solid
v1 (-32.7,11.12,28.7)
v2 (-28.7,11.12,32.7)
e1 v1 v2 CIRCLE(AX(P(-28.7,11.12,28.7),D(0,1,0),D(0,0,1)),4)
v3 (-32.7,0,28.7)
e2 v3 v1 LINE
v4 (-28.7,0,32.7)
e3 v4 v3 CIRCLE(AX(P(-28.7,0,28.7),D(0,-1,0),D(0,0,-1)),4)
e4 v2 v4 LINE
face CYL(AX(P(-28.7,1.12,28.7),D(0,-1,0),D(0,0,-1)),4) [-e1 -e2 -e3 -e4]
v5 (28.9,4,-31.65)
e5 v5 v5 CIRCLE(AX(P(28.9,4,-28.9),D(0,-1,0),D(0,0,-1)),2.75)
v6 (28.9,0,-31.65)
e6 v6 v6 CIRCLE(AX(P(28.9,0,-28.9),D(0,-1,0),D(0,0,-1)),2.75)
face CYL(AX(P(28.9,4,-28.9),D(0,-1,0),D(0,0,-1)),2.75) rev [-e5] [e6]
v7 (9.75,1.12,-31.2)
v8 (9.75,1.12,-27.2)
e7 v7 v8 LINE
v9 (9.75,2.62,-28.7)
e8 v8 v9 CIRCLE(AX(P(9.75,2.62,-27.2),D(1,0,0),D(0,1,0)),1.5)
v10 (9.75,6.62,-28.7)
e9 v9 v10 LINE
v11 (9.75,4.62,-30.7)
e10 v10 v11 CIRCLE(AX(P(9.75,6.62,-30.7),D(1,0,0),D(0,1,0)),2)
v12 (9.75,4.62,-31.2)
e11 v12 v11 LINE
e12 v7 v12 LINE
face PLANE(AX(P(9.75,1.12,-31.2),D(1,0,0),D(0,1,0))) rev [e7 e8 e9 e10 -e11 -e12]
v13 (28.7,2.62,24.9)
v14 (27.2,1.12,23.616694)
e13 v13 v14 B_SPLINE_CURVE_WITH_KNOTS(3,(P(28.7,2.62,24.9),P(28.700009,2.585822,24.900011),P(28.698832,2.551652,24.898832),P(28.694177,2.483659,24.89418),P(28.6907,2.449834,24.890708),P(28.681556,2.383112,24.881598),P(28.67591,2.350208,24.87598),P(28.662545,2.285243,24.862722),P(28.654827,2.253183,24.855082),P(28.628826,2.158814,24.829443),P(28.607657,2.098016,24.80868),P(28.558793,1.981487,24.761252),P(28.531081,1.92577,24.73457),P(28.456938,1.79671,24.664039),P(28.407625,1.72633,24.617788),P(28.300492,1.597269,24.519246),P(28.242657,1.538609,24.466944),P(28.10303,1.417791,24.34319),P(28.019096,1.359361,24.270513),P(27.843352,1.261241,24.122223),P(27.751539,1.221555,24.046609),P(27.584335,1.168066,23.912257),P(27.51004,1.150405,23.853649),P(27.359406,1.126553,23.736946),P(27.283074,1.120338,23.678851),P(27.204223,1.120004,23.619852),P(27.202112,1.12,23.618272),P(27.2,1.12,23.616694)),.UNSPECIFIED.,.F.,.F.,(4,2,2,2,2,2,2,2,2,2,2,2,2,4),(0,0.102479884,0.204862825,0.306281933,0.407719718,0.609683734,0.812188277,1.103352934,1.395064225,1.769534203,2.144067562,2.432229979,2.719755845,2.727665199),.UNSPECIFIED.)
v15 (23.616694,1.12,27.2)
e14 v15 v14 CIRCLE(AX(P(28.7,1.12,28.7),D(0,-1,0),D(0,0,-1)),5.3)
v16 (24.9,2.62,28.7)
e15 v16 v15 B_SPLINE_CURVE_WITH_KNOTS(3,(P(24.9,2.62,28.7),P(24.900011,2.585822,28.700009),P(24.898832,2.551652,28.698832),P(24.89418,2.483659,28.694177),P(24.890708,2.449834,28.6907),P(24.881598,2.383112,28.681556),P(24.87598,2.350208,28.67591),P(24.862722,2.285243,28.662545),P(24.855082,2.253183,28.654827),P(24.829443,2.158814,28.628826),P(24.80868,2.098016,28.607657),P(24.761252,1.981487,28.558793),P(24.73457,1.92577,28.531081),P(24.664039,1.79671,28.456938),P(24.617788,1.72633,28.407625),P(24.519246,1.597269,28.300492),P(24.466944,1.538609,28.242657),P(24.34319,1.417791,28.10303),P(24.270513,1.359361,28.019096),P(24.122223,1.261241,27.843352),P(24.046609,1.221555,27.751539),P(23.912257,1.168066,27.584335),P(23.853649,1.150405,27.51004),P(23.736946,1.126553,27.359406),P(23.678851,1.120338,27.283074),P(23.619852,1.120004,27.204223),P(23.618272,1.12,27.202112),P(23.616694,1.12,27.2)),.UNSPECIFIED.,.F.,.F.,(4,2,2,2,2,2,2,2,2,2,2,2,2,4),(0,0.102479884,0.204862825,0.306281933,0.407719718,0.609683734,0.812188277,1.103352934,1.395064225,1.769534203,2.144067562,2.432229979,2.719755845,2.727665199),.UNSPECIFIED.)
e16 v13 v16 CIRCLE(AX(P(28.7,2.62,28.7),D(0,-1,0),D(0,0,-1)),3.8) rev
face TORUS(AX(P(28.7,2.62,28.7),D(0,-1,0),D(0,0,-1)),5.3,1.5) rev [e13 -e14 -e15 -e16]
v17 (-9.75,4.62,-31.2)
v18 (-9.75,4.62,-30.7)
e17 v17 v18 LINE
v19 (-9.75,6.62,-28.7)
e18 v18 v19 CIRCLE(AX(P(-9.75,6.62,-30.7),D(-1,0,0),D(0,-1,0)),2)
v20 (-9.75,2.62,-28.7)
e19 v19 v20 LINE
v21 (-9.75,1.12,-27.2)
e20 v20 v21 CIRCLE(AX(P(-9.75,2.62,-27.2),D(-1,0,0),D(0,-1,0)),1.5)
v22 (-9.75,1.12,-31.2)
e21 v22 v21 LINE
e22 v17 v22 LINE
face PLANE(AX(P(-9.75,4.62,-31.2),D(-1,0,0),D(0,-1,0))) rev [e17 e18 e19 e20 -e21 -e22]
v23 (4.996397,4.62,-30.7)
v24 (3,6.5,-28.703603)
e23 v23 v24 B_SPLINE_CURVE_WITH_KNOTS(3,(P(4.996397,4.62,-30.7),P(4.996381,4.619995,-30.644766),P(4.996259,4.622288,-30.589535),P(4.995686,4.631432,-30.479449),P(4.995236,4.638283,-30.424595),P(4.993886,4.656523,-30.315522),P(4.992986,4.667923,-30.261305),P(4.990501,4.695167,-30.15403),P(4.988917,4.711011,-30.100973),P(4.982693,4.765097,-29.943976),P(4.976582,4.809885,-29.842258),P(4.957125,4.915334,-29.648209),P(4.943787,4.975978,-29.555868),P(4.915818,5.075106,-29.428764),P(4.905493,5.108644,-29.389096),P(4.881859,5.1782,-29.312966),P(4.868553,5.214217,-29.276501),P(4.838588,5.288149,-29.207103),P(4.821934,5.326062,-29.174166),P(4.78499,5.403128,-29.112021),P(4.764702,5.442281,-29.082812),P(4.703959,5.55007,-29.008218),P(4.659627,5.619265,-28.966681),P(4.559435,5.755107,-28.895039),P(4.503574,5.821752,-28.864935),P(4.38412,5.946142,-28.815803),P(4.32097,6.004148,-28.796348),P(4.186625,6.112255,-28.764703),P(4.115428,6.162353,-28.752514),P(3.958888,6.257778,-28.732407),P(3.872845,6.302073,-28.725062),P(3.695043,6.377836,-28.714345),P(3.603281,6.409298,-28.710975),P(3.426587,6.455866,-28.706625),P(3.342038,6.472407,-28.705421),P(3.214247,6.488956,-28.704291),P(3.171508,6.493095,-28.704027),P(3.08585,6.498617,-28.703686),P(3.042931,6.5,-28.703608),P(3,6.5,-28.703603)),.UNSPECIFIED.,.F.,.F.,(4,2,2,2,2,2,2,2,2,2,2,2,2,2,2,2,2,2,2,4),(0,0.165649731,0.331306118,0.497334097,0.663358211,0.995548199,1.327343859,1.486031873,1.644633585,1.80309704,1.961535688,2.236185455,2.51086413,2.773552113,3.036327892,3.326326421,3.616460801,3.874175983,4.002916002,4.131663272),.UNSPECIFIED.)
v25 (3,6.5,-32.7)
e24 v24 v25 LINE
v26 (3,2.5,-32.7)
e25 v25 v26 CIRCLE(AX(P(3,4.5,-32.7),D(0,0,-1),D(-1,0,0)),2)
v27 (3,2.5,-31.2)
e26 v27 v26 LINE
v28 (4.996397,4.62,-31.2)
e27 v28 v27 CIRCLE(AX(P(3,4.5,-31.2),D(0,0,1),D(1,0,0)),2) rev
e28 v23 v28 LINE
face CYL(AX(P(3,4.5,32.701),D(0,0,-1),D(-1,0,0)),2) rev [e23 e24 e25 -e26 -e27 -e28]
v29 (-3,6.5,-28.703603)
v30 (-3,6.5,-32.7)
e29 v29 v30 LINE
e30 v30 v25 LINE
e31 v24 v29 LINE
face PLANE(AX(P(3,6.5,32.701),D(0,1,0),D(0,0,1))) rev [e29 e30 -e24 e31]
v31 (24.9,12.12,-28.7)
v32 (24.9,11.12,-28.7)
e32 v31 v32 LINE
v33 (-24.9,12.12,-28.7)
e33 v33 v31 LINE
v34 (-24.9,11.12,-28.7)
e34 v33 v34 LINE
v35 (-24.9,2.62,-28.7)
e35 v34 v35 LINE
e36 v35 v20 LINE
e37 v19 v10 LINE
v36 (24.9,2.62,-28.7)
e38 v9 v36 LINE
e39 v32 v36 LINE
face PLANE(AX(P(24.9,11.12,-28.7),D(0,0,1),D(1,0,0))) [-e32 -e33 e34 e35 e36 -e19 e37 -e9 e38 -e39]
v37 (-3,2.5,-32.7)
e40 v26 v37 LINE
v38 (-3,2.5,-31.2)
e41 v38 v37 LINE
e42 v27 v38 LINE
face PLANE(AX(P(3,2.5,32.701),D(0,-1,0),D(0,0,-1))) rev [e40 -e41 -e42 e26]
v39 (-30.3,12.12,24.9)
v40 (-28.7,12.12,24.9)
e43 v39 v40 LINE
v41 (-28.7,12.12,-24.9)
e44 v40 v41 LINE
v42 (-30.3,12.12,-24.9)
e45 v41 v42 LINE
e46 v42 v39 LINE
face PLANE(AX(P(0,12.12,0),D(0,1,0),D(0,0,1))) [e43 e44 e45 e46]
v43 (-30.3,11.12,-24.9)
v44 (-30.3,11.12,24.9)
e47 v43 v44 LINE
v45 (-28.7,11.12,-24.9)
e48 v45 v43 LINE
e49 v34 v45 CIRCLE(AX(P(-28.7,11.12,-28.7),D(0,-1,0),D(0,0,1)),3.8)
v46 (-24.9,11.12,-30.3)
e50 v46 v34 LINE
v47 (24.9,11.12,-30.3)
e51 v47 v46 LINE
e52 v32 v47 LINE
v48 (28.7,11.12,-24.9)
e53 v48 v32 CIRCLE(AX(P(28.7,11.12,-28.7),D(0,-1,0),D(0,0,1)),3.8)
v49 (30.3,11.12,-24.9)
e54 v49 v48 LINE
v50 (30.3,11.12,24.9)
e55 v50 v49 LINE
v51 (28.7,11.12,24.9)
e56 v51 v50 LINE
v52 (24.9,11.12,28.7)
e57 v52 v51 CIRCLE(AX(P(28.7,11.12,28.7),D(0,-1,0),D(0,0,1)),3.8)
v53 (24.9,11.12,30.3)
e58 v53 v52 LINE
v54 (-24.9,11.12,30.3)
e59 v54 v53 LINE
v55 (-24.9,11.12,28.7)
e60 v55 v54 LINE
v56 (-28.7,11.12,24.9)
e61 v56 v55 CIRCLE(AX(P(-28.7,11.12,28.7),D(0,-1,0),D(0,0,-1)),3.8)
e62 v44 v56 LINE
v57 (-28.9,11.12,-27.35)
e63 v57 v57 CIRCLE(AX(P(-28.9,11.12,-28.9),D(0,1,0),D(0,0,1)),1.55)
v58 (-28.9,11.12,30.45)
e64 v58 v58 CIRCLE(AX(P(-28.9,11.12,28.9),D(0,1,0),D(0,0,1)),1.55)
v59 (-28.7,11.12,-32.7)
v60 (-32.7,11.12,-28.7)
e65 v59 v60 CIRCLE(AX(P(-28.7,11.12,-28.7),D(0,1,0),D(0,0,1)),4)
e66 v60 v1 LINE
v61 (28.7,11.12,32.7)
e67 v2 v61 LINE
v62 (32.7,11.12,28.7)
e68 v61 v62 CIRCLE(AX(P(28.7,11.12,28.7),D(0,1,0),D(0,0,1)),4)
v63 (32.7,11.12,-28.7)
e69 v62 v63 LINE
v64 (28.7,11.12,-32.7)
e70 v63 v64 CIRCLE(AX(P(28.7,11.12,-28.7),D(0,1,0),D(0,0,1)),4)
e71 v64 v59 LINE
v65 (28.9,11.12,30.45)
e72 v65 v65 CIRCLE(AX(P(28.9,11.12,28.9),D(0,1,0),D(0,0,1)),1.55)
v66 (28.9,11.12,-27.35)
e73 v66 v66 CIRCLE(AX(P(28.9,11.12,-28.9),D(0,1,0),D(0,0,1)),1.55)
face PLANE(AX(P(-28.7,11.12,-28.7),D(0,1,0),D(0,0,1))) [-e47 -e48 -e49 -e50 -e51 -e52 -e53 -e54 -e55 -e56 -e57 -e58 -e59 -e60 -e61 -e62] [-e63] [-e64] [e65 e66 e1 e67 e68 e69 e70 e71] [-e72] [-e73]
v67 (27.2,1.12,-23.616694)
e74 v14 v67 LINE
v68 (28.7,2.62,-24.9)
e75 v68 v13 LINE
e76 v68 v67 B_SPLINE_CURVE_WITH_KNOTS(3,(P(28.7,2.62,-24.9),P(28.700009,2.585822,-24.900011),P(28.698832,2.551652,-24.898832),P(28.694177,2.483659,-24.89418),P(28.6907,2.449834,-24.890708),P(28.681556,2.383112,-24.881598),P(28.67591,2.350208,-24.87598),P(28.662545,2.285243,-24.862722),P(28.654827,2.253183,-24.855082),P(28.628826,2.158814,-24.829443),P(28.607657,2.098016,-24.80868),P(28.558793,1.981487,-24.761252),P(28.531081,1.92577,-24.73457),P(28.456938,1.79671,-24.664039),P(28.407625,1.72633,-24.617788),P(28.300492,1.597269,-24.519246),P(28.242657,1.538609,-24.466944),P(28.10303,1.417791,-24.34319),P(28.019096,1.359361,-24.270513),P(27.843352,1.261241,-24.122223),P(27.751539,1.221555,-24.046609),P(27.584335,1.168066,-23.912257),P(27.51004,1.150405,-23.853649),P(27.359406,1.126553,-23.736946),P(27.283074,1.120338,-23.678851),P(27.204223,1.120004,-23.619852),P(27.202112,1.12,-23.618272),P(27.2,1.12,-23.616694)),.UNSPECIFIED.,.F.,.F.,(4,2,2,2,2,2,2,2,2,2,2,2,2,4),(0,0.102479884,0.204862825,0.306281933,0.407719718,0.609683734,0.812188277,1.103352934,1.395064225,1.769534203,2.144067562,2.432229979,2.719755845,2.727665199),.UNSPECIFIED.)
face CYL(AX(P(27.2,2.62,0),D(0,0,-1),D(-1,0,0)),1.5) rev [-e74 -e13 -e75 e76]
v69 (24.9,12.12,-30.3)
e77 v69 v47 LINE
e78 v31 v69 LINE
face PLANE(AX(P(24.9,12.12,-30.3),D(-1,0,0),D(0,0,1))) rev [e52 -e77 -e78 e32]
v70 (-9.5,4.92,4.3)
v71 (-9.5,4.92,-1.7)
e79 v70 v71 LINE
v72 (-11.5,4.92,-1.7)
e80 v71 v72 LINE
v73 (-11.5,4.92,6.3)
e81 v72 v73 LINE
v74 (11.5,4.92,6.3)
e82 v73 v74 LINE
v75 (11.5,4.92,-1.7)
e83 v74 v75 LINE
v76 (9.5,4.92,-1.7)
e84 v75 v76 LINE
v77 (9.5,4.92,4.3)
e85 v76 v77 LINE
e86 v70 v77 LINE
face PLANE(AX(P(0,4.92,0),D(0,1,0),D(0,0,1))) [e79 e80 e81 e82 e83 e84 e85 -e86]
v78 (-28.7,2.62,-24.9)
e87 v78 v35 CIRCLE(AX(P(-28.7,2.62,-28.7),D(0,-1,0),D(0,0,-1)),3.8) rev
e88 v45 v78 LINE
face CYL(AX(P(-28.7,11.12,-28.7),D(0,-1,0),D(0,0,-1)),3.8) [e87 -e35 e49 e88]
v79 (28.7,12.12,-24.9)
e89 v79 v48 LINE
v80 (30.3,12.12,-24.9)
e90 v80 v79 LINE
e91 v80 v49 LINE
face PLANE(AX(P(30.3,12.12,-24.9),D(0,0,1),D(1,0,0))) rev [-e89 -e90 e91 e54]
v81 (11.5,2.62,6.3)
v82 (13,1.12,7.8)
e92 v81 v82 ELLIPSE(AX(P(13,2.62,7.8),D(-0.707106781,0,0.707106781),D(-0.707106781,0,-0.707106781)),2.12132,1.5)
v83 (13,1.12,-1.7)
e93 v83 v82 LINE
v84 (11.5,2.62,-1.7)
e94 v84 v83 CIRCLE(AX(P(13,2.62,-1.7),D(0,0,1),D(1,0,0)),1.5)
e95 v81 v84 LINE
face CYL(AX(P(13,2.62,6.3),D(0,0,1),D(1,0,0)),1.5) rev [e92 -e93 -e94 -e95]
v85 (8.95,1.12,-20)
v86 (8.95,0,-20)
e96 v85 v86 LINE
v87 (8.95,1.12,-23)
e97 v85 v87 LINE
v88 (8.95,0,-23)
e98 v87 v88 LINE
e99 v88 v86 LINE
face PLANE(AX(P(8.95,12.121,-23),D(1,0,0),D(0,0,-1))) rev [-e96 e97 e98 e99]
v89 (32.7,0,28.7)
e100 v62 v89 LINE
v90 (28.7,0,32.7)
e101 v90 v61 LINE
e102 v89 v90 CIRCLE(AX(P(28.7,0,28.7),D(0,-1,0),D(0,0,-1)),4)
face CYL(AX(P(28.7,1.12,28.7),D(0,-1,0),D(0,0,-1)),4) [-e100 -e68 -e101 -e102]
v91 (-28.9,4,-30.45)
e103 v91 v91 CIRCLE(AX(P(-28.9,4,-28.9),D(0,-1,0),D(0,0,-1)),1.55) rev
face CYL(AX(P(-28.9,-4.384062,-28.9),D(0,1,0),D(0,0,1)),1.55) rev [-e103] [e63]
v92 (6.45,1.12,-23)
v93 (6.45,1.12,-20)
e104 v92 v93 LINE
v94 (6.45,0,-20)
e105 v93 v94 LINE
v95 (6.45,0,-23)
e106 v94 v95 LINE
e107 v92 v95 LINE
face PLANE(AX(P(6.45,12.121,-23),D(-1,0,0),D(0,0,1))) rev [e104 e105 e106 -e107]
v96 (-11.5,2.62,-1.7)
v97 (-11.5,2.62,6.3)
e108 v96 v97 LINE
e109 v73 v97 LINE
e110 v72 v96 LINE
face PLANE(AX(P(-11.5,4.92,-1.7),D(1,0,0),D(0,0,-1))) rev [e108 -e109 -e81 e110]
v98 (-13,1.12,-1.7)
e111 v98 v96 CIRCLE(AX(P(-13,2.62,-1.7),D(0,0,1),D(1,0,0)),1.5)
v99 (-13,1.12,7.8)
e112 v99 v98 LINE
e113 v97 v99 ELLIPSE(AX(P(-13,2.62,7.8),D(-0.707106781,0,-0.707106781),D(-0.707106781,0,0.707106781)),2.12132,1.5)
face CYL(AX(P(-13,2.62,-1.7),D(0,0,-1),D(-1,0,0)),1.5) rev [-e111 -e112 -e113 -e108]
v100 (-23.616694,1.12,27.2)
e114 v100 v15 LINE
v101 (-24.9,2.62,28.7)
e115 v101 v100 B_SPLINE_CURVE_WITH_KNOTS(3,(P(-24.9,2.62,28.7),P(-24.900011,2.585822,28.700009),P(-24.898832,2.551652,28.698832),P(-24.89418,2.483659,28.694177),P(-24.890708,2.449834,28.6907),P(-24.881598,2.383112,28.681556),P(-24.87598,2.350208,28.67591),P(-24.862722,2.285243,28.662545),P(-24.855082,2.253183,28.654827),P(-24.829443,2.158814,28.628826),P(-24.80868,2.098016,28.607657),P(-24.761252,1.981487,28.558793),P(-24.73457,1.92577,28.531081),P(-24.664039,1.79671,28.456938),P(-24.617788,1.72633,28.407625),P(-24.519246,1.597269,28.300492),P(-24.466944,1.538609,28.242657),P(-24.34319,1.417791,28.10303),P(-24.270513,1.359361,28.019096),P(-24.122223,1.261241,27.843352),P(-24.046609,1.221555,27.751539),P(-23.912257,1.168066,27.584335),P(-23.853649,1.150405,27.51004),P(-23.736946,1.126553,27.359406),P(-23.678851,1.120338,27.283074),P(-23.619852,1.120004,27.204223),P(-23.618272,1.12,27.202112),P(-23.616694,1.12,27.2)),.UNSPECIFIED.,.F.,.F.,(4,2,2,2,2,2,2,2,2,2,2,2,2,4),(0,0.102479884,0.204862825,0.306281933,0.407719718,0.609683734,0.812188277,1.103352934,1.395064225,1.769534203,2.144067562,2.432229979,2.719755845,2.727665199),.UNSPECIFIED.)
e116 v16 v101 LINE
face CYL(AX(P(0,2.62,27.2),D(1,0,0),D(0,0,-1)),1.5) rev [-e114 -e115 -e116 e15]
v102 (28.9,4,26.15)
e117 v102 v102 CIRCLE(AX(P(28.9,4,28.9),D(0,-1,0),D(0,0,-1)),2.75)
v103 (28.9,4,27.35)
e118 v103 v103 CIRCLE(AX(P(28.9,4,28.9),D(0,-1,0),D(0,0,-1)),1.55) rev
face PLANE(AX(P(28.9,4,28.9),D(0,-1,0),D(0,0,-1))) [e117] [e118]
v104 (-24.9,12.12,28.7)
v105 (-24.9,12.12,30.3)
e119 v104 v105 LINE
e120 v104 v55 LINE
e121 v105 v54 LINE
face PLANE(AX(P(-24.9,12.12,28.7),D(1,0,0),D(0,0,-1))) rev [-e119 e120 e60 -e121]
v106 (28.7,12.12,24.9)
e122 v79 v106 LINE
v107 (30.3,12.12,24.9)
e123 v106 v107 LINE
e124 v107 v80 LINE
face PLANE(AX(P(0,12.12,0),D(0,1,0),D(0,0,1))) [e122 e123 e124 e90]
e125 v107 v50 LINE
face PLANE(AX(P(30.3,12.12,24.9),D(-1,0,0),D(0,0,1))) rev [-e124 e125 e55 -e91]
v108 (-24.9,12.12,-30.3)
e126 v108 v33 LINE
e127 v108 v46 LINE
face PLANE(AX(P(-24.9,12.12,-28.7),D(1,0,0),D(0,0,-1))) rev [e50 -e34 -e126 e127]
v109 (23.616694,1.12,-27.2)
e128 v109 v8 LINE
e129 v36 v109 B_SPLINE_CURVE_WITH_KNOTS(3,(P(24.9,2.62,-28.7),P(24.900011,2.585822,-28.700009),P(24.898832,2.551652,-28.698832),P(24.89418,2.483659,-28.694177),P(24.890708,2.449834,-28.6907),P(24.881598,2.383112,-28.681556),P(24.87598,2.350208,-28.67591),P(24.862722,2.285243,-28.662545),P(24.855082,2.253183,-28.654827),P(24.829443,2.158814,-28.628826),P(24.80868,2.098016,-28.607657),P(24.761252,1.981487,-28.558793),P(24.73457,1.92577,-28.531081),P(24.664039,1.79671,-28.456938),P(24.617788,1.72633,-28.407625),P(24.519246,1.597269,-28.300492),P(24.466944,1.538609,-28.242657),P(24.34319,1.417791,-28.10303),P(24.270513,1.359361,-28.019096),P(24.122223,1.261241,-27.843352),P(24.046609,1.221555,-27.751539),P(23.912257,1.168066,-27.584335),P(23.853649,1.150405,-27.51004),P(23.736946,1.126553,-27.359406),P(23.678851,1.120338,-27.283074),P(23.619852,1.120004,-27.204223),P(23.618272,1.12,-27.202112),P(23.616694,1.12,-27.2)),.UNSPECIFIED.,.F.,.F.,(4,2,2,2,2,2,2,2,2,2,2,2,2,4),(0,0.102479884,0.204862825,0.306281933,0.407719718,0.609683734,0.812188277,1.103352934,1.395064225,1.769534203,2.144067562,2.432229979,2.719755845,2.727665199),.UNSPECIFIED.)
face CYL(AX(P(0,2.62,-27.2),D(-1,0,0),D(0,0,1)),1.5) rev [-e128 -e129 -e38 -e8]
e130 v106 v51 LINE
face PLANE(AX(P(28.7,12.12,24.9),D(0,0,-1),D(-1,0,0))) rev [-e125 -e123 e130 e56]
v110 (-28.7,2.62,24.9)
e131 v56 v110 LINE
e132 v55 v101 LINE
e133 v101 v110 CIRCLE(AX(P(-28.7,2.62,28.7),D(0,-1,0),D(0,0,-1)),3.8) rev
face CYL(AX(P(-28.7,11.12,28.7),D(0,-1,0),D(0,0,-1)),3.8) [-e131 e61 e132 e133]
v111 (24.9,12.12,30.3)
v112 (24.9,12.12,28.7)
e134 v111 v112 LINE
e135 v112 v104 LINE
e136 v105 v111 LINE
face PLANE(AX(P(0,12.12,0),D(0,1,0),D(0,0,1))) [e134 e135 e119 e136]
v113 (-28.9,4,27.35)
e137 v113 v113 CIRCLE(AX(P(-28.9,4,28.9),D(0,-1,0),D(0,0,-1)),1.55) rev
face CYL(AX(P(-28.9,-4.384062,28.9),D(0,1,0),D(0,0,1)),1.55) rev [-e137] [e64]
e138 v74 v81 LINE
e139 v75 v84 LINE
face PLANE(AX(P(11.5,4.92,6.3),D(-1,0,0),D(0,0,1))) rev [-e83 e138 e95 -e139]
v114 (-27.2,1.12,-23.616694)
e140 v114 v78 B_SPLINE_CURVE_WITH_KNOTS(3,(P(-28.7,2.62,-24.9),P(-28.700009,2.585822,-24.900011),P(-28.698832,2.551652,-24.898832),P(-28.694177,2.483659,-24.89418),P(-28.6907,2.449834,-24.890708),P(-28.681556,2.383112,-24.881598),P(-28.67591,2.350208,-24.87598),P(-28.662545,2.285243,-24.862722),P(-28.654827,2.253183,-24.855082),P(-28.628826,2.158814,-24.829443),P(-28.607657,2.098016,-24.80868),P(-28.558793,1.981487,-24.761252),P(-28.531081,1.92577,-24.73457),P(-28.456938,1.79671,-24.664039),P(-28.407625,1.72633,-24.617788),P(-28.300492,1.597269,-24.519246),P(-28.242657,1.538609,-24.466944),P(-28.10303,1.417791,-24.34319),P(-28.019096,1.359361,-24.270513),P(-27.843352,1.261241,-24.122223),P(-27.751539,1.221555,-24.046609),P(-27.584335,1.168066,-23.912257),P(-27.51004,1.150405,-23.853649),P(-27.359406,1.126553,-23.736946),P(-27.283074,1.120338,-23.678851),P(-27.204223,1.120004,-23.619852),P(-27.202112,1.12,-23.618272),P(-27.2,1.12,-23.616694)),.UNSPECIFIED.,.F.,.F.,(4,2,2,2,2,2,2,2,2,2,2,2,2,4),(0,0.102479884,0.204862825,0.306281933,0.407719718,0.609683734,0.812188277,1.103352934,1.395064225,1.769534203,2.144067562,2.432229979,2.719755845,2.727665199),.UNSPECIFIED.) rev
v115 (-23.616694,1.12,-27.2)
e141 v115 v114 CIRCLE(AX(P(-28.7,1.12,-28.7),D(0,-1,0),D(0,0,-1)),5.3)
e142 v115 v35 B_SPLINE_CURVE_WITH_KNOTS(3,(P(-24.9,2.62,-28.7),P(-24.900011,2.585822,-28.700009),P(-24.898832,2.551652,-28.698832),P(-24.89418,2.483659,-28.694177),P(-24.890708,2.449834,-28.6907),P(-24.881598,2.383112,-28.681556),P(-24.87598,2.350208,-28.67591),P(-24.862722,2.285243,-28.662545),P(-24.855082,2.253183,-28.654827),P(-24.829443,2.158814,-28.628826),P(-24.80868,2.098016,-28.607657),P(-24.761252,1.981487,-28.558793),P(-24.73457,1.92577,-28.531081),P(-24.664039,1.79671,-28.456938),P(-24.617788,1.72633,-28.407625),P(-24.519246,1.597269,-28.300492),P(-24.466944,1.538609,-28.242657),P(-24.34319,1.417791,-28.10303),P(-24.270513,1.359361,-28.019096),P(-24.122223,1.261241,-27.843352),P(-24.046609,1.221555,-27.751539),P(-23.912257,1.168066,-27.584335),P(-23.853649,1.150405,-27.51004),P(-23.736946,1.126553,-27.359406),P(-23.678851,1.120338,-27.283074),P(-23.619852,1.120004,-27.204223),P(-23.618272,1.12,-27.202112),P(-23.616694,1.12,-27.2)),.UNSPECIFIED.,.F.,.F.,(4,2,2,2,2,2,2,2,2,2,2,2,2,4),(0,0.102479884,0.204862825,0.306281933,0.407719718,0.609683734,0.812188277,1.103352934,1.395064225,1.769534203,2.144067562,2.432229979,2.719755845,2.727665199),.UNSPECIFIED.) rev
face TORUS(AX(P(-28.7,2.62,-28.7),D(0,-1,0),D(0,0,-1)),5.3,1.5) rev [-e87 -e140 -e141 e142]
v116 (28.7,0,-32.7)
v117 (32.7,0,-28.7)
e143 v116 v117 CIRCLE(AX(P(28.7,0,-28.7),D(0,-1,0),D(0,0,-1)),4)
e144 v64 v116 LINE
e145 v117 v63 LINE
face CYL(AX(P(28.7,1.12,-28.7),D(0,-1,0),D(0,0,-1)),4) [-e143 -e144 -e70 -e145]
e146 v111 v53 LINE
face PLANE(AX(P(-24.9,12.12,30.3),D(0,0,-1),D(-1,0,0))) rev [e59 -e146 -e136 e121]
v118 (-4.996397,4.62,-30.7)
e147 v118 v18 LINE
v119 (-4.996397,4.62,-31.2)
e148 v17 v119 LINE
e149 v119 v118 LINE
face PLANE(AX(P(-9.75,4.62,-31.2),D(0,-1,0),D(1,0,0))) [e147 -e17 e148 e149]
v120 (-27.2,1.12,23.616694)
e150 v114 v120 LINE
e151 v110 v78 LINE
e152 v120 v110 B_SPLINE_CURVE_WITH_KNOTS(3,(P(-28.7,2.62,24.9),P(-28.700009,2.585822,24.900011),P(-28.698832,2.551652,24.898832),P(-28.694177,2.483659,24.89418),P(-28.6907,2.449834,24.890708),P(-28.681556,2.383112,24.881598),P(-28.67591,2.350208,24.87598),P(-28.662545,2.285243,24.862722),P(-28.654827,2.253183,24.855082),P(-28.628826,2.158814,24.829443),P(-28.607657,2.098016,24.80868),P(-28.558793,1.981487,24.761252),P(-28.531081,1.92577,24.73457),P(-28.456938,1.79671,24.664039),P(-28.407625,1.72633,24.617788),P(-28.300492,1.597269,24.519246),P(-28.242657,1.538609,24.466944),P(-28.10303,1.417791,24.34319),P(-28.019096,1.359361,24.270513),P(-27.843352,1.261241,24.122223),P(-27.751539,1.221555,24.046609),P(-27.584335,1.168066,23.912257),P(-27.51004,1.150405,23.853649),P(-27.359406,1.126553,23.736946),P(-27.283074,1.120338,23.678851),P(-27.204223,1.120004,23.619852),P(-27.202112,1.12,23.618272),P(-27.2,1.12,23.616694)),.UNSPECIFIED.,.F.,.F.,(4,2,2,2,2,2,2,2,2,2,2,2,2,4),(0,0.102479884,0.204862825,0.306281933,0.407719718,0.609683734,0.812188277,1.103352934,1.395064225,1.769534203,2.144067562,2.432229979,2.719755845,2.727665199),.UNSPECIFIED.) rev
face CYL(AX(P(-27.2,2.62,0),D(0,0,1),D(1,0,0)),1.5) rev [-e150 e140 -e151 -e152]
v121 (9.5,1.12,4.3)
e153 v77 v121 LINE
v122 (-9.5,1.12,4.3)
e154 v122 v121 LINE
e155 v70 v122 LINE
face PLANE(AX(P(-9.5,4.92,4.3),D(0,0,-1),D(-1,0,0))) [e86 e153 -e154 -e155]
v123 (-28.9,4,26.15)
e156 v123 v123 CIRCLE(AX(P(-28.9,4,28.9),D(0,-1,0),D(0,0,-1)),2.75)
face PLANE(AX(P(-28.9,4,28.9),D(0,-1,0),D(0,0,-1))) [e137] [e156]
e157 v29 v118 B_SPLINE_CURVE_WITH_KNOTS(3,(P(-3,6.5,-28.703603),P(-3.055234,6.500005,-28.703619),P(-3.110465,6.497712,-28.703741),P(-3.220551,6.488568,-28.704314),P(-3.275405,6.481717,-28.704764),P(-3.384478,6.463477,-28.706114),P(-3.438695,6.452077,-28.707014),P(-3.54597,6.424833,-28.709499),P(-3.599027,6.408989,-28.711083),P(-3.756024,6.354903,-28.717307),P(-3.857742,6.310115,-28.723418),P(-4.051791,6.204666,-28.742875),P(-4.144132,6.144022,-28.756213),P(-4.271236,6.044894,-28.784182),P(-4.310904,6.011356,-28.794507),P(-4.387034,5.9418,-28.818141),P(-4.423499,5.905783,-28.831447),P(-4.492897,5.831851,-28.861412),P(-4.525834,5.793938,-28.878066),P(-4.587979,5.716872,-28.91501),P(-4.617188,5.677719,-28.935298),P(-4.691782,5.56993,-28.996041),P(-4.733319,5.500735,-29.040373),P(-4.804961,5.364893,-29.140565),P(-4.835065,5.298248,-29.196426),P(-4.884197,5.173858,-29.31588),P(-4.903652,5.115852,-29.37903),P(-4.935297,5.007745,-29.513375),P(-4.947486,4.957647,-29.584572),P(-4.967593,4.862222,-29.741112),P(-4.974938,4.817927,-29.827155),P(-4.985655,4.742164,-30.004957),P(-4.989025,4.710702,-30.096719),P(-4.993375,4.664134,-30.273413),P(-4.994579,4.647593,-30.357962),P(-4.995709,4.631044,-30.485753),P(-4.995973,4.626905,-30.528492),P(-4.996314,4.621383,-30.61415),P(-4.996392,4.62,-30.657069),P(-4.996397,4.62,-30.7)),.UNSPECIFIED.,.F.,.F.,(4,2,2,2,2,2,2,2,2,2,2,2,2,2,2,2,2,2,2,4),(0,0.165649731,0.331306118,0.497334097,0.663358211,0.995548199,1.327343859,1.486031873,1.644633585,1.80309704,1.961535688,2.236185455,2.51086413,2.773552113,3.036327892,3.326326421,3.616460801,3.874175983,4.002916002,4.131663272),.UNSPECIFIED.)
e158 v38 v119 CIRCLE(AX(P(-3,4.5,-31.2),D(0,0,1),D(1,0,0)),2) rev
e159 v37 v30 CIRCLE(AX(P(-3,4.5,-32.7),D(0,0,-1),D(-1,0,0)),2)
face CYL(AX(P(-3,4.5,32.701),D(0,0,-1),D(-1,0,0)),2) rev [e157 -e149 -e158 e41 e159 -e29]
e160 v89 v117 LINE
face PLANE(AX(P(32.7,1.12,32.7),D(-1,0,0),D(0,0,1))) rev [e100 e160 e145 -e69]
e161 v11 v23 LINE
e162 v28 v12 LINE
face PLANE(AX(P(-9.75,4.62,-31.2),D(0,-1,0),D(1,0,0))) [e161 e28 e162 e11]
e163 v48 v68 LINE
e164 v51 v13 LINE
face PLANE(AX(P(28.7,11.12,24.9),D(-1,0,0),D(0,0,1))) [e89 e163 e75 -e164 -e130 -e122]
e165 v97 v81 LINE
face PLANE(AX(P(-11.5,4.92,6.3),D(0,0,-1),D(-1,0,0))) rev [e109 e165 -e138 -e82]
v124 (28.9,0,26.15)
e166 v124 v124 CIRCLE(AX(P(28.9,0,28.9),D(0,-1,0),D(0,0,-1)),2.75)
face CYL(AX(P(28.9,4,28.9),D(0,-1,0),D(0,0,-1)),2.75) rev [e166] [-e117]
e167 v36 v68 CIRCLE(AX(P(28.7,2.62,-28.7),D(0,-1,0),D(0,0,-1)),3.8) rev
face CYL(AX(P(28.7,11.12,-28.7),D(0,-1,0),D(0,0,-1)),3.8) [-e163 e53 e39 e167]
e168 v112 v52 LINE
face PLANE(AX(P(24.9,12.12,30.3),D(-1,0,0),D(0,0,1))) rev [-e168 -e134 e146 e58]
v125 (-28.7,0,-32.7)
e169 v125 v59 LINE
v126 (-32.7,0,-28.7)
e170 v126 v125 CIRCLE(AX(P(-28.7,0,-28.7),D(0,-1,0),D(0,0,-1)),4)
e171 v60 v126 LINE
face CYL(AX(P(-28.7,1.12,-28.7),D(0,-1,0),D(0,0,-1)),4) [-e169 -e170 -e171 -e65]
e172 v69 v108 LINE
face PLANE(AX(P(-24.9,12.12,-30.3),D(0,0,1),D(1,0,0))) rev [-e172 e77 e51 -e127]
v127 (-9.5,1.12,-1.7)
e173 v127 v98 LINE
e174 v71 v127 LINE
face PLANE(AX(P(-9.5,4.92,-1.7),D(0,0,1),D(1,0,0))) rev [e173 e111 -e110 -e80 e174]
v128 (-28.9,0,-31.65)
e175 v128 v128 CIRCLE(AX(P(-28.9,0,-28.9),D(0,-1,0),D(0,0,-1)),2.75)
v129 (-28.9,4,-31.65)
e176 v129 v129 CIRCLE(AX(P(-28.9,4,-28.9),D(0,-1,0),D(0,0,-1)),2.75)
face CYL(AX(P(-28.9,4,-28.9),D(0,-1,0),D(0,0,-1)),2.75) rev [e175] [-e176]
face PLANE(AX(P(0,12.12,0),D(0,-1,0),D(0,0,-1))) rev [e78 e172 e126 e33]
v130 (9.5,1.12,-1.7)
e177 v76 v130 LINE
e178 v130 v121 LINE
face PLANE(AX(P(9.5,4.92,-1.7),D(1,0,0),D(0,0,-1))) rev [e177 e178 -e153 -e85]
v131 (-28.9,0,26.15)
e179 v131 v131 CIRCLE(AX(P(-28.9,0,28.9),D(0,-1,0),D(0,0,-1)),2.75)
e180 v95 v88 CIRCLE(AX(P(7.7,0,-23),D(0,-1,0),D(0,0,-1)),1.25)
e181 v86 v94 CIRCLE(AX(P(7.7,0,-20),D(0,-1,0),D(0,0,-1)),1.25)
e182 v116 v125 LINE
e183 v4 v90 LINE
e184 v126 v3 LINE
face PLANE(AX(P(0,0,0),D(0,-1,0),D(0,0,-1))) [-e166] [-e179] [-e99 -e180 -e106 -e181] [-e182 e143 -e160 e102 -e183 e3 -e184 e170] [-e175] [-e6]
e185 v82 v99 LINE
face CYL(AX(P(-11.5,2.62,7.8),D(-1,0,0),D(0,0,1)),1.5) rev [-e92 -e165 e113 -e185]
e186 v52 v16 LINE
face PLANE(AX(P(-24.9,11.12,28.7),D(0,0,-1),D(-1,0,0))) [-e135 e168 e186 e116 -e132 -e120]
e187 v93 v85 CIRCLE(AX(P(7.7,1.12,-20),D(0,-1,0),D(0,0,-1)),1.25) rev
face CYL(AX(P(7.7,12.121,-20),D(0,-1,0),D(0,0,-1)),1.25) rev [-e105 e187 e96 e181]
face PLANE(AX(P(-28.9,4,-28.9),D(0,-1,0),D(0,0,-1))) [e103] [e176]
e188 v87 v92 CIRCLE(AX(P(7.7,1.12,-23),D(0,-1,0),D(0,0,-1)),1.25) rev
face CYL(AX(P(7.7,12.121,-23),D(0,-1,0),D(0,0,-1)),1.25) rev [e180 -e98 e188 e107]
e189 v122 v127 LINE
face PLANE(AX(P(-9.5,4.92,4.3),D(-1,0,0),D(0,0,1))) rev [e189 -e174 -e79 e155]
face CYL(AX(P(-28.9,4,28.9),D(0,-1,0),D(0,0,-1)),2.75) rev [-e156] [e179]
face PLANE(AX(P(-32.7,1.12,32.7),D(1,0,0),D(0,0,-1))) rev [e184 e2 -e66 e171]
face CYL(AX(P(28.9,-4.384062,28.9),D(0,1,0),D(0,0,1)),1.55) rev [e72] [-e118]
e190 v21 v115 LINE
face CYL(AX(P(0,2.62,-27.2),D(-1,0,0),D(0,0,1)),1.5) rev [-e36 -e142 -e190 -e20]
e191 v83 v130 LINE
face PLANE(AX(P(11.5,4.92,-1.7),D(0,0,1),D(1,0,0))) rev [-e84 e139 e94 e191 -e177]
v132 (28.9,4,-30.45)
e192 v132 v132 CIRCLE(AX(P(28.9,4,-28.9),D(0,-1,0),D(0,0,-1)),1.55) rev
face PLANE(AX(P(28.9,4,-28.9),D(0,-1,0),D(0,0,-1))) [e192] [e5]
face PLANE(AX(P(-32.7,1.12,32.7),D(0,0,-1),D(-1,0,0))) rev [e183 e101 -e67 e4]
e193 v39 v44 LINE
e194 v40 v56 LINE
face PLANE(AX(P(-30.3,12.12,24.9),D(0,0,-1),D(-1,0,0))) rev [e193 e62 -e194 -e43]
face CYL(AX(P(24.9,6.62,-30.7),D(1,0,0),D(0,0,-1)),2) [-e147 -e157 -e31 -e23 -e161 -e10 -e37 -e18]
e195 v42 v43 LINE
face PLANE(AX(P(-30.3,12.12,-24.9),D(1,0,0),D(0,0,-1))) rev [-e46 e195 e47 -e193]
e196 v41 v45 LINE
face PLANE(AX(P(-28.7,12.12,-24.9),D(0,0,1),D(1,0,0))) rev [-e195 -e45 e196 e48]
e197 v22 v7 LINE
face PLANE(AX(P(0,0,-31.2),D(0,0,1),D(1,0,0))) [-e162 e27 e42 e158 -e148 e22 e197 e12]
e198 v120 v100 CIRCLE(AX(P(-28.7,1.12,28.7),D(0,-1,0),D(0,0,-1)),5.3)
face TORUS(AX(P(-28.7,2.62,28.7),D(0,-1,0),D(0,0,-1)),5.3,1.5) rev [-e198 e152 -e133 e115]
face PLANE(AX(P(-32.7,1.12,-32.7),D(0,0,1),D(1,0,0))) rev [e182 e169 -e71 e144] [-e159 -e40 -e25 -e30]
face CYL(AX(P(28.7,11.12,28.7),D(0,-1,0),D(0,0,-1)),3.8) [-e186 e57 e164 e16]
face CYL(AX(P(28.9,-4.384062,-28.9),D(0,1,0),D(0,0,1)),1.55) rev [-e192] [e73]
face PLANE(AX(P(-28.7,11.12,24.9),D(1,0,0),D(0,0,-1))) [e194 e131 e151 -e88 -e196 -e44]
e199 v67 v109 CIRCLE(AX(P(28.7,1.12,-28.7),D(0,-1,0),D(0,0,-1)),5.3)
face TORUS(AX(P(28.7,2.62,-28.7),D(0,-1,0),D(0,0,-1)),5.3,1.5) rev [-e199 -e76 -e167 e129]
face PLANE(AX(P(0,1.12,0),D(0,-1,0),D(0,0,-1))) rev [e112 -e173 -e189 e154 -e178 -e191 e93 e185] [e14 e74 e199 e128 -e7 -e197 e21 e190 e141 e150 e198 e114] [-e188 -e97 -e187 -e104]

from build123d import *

# Parameters (mm, degrees)
SKETCH1_W           = 65.4
SKETCH1_H           = 65.4
BOSS_EXTRUDE1_DEPTH = 1.12
FILLET1_R           = 4
BOSS_EXTRUDE2_START = 10
BOSS_EXTRUDE2_DEPTH = 10
CUT_EXTRUDE1_REACH  = 75.96
SKETCH4_W           = 19.5
SKETCH4_H           = 3.5
CUT_EXTRUDE2_DEPTH  = 2.5
FILLET3_R           = 2
SKETCH5_W           = 1.6
SKETCH5_H           = 49.8
SKETCH5_W_2         = 49.8
SKETCH5_H_2         = 1.6
BOSS_EXTRUDE3_DEPTH = 1
BOSS_EXTRUDE4_DEPTH = 3.8
SKETCH7_R           = 1.55
CUT_EXTRUDE3_DEPTH  = 11.12
SKETCH8_R           = 2.75
CUT_EXTRUDE4_DEPTH  = 4
FILLET4_R           = 1.5
FILLET5_R           = 1.5
CUT_EXTRUDE5_REACH  = 49.807


with BuildPart() as part:
    # Sketch1 → Boss-Extrude1 (new body)
    with BuildSketch(Plane(origin=(0, 0, 0), x_dir=(1, 0, 0), z_dir=(0, 1, 0))):
        Rectangle(SKETCH1_W, SKETCH1_H)
    extrude(amount=BOSS_EXTRUDE1_DEPTH)

    # Fillet1
    fillet1_edges = [part.edges().sort_by_distance(p)[0] for p in [
        (32.7, 0.56, 32.7),
        (-32.7, 0.56, 32.7),
        (-32.7, 0.56, -32.7),
        (32.7, 0.56, -32.7),
    ]]
    fillet(fillet1_edges, radius=FILLET1_R)

    # Sketch2 → Boss-Extrude2 (add)
    with BuildSketch(Plane(origin=(0, 1.12, 0), x_dir=(1, 0, 0), z_dir=(0, 1, 0)).offset(BOSS_EXTRUDE2_START)):
        with BuildLine():
            Line((-32.7, 28.7), (-32.7, -28.7))
            ThreePointArc((-32.7, -28.7), (-31.528427125, -31.528427125), (-28.7, -32.7))
            Line((-28.7, -32.7), (28.7, -32.7))
            ThreePointArc((28.7, -32.7), (31.528427125, -31.528427125), (32.7, -28.7))
            Line((32.7, -28.7), (32.7, 28.7))
            ThreePointArc((32.7, 28.7), (31.528427125, 31.528427125), (28.7, 32.7))
            Line((28.7, 32.7), (-28.7, 32.7))
            ThreePointArc((-28.7, 32.7), (-31.528427125, 31.528427125), (-32.7, 28.7))
        make_face()
        with BuildLine():
            Line((24.9, 28.7), (-24.9, 28.7))
            ThreePointArc((-24.9, 28.7), (-26.012994231, 26.012994231), (-28.7, 24.9))
            Line((-28.7, 24.9), (-28.7, -24.9))
            ThreePointArc((-28.7, -24.9), (-26.012994231, -26.012994231), (-24.9, -28.7))
            Line((-24.9, -28.7), (24.9, -28.7))
            ThreePointArc((24.9, -28.7), (26.012994231, -26.012994231), (28.7, -24.9))
            Line((28.7, -24.9), (28.7, 24.9))
            ThreePointArc((28.7, 24.9), (26.012994231, 26.012994231), (24.9, 28.7))
        make_face(mode=Mode.SUBTRACT)
    extrude(amount=-BOSS_EXTRUDE2_DEPTH)

    # Sketch3 → Cut-Extrude1 (cut, up to next)
    with BuildSketch(Plane(origin=(0, 0, -32.7), x_dir=(-1, 0, 0), z_dir=(0, 0, -1)), mode=Mode.PRIVATE) as cut_extrude1_sk1:
        with BuildLine():
            Line((-3, 6.5), (3, 6.5))
            ThreePointArc((3, 6.5), (5, 4.5), (3, 2.5))
            Line((3, 2.5), (-3, 2.5))
            ThreePointArc((-3, 2.5), (-5, 4.5), (-3, 6.5))
        make_face()
    cut_extrude1_tool1 = extrude(cut_extrude1_sk1.sketch, amount=-CUT_EXTRUDE1_REACH, mode=Mode.PRIVATE) & part.part
    add(cut_extrude1_tool1.solids().sort_by_distance((0, 4.5, -32.7))[0], mode=Mode.SUBTRACT)

    # Sketch4 → Cut-Extrude2 (cut)
    with BuildSketch(Plane.XY.offset(-28.7)):
        with Locations((0, 2.87)):
            Rectangle(SKETCH4_W, SKETCH4_H)
    extrude(amount=-CUT_EXTRUDE2_DEPTH, mode=Mode.SUBTRACT)

    # Fillet3
    # the kernel refuses this fillet: 2 mm, written as the material it takes off along each edge
    with BuildSketch(Plane(origin=(-0.003603246, 4.62, -28.7), x_dir=(0, 1, 0), z_dir=(1, 0, 0)), Plane(origin=(-9.75, 4.62, -28.7), x_dir=(0, 1, 0), z_dir=(1, 0, 0))) as fillet3_piece_1:
        with BuildLine():
            CenterArc((FILLET3_R, -FILLET3_R), FILLET3_R, 90, 90)
            Line((0, -FILLET3_R), (0, 0))
            Line((0, 0), (FILLET3_R, 0))
        make_face()
    extrude(amount=9.753603246, mode=Mode.SUBTRACT)

    # Sketch5 → Boss-Extrude3 (add)
    with BuildSketch(Plane(origin=(0, 11.12, 0), x_dir=(1, 0, 0), z_dir=(0, 1, 0))):
        with Locations((-29.5, 0)):
            Rectangle(SKETCH5_W, SKETCH5_H)
        with Locations((0, -29.5)):
            Rectangle(SKETCH5_W_2, SKETCH5_H_2)
        with Locations((29.5, 0)):
            Rectangle(SKETCH5_W, SKETCH5_H)
        with Locations((0, 29.5)):
            Rectangle(SKETCH5_W_2, SKETCH5_H_2)
    extrude(amount=BOSS_EXTRUDE3_DEPTH)

    # Sketch6 → Boss-Extrude4 (add)
    with BuildSketch(Plane(origin=(0, 1.12, 0), x_dir=(1, 0, 0), z_dir=(0, 1, 0))):
        Polygon((-9.5, -4.3), (9.5, -4.3), (9.5, 1.7), (11.5, 1.7), (11.5, -6.3), (-11.5, -6.3), (-11.5, 1.7), (-9.5, 1.7), align=None)
    extrude(amount=BOSS_EXTRUDE4_DEPTH)

    # Sketch7 → Cut-Extrude3 (cut)
    with BuildSketch(Plane(origin=(0, 11.12, 0), x_dir=(1, 0, 0), z_dir=(0, 1, 0))):
        with Locations(Location((-28.9, 28.9, 0), (0, 0, 270))):
            Circle(SKETCH7_R)
        with Locations(Location((28.9, 28.9, 0), (0, 0, 270))):
            Circle(SKETCH7_R)
        with Locations(Location((28.9, -28.9, 0), (0, 0, 270))):
            Circle(SKETCH7_R)
        with Locations(Location((-28.9, -28.9, 0), (0, 0, 270))):
            Circle(SKETCH7_R)
    extrude(amount=-CUT_EXTRUDE3_DEPTH, mode=Mode.SUBTRACT)

    # Sketch8 → Cut-Extrude4 (cut)
    with BuildSketch(Plane.XZ):
        with Locations(Location((-28.9, 28.9, 0), (0, 0, 270))):
            Circle(SKETCH8_R)
        with Locations(Location((28.9, 28.9, 0), (0, 0, 270))):
            Circle(SKETCH8_R)
        with Locations(Location((28.9, -28.9, 0), (0, 0, 270))):
            Circle(SKETCH8_R)
        with Locations(Location((-28.9, -28.9, 0), (0, 0, 270))):
            Circle(SKETCH8_R)
    extrude(amount=-CUT_EXTRUDE4_DEPTH, mode=Mode.SUBTRACT)

    # Fillet4
    fillet4_edges = [part.edges().sort_by_distance(p)[0] for p in [
        (-11.5, 1.12, 2.3),
        (0, 1.12, 6.3),
        (11.5, 1.12, 2.3),
    ]]
    fillet(fillet4_edges, radius=FILLET4_R)

    # Fillet5
    fillet5_edges = [part.edges().sort_by_distance(p)[0] for p in [
        (-17.325, 1.12, -28.7),
        (26.012994231, 1.12, -26.012994231),
        (17.325, 1.12, -28.7),
        (-26.012994231, 1.12, -26.012994231),
        (-28.7, 1.12, 0),
        (-26.012994231, 1.12, 26.012994231),
        (0, 1.12, 28.7),
        (26.012994231, 1.12, 26.012994231),
        (28.7, 1.12, 0),
    ]]
    fillet(fillet5_edges, radius=FILLET5_R)

    # Sketch9 → Cut-Extrude5 (cut, up to next)
    with BuildSketch(Plane.XZ, mode=Mode.PRIVATE) as cut_extrude5_sk1:
        with BuildLine():
            Line((6.45, -23), (6.45, -20))
            ThreePointArc((6.45, -20), (7.7, -18.75), (8.95, -20))
            Line((8.95, -20), (8.95, -23))
            ThreePointArc((8.95, -23), (7.7, -24.25), (6.45, -23))
        make_face()
    cut_extrude5_tool1 = extrude(cut_extrude5_sk1.sketch, amount=-CUT_EXTRUDE5_REACH, mode=Mode.PRIVATE) & part.part
    add(cut_extrude5_tool1.solids().sort_by_distance((7.7, 0, -21.5))[0], mode=Mode.SUBTRACT)


solid = part.part
